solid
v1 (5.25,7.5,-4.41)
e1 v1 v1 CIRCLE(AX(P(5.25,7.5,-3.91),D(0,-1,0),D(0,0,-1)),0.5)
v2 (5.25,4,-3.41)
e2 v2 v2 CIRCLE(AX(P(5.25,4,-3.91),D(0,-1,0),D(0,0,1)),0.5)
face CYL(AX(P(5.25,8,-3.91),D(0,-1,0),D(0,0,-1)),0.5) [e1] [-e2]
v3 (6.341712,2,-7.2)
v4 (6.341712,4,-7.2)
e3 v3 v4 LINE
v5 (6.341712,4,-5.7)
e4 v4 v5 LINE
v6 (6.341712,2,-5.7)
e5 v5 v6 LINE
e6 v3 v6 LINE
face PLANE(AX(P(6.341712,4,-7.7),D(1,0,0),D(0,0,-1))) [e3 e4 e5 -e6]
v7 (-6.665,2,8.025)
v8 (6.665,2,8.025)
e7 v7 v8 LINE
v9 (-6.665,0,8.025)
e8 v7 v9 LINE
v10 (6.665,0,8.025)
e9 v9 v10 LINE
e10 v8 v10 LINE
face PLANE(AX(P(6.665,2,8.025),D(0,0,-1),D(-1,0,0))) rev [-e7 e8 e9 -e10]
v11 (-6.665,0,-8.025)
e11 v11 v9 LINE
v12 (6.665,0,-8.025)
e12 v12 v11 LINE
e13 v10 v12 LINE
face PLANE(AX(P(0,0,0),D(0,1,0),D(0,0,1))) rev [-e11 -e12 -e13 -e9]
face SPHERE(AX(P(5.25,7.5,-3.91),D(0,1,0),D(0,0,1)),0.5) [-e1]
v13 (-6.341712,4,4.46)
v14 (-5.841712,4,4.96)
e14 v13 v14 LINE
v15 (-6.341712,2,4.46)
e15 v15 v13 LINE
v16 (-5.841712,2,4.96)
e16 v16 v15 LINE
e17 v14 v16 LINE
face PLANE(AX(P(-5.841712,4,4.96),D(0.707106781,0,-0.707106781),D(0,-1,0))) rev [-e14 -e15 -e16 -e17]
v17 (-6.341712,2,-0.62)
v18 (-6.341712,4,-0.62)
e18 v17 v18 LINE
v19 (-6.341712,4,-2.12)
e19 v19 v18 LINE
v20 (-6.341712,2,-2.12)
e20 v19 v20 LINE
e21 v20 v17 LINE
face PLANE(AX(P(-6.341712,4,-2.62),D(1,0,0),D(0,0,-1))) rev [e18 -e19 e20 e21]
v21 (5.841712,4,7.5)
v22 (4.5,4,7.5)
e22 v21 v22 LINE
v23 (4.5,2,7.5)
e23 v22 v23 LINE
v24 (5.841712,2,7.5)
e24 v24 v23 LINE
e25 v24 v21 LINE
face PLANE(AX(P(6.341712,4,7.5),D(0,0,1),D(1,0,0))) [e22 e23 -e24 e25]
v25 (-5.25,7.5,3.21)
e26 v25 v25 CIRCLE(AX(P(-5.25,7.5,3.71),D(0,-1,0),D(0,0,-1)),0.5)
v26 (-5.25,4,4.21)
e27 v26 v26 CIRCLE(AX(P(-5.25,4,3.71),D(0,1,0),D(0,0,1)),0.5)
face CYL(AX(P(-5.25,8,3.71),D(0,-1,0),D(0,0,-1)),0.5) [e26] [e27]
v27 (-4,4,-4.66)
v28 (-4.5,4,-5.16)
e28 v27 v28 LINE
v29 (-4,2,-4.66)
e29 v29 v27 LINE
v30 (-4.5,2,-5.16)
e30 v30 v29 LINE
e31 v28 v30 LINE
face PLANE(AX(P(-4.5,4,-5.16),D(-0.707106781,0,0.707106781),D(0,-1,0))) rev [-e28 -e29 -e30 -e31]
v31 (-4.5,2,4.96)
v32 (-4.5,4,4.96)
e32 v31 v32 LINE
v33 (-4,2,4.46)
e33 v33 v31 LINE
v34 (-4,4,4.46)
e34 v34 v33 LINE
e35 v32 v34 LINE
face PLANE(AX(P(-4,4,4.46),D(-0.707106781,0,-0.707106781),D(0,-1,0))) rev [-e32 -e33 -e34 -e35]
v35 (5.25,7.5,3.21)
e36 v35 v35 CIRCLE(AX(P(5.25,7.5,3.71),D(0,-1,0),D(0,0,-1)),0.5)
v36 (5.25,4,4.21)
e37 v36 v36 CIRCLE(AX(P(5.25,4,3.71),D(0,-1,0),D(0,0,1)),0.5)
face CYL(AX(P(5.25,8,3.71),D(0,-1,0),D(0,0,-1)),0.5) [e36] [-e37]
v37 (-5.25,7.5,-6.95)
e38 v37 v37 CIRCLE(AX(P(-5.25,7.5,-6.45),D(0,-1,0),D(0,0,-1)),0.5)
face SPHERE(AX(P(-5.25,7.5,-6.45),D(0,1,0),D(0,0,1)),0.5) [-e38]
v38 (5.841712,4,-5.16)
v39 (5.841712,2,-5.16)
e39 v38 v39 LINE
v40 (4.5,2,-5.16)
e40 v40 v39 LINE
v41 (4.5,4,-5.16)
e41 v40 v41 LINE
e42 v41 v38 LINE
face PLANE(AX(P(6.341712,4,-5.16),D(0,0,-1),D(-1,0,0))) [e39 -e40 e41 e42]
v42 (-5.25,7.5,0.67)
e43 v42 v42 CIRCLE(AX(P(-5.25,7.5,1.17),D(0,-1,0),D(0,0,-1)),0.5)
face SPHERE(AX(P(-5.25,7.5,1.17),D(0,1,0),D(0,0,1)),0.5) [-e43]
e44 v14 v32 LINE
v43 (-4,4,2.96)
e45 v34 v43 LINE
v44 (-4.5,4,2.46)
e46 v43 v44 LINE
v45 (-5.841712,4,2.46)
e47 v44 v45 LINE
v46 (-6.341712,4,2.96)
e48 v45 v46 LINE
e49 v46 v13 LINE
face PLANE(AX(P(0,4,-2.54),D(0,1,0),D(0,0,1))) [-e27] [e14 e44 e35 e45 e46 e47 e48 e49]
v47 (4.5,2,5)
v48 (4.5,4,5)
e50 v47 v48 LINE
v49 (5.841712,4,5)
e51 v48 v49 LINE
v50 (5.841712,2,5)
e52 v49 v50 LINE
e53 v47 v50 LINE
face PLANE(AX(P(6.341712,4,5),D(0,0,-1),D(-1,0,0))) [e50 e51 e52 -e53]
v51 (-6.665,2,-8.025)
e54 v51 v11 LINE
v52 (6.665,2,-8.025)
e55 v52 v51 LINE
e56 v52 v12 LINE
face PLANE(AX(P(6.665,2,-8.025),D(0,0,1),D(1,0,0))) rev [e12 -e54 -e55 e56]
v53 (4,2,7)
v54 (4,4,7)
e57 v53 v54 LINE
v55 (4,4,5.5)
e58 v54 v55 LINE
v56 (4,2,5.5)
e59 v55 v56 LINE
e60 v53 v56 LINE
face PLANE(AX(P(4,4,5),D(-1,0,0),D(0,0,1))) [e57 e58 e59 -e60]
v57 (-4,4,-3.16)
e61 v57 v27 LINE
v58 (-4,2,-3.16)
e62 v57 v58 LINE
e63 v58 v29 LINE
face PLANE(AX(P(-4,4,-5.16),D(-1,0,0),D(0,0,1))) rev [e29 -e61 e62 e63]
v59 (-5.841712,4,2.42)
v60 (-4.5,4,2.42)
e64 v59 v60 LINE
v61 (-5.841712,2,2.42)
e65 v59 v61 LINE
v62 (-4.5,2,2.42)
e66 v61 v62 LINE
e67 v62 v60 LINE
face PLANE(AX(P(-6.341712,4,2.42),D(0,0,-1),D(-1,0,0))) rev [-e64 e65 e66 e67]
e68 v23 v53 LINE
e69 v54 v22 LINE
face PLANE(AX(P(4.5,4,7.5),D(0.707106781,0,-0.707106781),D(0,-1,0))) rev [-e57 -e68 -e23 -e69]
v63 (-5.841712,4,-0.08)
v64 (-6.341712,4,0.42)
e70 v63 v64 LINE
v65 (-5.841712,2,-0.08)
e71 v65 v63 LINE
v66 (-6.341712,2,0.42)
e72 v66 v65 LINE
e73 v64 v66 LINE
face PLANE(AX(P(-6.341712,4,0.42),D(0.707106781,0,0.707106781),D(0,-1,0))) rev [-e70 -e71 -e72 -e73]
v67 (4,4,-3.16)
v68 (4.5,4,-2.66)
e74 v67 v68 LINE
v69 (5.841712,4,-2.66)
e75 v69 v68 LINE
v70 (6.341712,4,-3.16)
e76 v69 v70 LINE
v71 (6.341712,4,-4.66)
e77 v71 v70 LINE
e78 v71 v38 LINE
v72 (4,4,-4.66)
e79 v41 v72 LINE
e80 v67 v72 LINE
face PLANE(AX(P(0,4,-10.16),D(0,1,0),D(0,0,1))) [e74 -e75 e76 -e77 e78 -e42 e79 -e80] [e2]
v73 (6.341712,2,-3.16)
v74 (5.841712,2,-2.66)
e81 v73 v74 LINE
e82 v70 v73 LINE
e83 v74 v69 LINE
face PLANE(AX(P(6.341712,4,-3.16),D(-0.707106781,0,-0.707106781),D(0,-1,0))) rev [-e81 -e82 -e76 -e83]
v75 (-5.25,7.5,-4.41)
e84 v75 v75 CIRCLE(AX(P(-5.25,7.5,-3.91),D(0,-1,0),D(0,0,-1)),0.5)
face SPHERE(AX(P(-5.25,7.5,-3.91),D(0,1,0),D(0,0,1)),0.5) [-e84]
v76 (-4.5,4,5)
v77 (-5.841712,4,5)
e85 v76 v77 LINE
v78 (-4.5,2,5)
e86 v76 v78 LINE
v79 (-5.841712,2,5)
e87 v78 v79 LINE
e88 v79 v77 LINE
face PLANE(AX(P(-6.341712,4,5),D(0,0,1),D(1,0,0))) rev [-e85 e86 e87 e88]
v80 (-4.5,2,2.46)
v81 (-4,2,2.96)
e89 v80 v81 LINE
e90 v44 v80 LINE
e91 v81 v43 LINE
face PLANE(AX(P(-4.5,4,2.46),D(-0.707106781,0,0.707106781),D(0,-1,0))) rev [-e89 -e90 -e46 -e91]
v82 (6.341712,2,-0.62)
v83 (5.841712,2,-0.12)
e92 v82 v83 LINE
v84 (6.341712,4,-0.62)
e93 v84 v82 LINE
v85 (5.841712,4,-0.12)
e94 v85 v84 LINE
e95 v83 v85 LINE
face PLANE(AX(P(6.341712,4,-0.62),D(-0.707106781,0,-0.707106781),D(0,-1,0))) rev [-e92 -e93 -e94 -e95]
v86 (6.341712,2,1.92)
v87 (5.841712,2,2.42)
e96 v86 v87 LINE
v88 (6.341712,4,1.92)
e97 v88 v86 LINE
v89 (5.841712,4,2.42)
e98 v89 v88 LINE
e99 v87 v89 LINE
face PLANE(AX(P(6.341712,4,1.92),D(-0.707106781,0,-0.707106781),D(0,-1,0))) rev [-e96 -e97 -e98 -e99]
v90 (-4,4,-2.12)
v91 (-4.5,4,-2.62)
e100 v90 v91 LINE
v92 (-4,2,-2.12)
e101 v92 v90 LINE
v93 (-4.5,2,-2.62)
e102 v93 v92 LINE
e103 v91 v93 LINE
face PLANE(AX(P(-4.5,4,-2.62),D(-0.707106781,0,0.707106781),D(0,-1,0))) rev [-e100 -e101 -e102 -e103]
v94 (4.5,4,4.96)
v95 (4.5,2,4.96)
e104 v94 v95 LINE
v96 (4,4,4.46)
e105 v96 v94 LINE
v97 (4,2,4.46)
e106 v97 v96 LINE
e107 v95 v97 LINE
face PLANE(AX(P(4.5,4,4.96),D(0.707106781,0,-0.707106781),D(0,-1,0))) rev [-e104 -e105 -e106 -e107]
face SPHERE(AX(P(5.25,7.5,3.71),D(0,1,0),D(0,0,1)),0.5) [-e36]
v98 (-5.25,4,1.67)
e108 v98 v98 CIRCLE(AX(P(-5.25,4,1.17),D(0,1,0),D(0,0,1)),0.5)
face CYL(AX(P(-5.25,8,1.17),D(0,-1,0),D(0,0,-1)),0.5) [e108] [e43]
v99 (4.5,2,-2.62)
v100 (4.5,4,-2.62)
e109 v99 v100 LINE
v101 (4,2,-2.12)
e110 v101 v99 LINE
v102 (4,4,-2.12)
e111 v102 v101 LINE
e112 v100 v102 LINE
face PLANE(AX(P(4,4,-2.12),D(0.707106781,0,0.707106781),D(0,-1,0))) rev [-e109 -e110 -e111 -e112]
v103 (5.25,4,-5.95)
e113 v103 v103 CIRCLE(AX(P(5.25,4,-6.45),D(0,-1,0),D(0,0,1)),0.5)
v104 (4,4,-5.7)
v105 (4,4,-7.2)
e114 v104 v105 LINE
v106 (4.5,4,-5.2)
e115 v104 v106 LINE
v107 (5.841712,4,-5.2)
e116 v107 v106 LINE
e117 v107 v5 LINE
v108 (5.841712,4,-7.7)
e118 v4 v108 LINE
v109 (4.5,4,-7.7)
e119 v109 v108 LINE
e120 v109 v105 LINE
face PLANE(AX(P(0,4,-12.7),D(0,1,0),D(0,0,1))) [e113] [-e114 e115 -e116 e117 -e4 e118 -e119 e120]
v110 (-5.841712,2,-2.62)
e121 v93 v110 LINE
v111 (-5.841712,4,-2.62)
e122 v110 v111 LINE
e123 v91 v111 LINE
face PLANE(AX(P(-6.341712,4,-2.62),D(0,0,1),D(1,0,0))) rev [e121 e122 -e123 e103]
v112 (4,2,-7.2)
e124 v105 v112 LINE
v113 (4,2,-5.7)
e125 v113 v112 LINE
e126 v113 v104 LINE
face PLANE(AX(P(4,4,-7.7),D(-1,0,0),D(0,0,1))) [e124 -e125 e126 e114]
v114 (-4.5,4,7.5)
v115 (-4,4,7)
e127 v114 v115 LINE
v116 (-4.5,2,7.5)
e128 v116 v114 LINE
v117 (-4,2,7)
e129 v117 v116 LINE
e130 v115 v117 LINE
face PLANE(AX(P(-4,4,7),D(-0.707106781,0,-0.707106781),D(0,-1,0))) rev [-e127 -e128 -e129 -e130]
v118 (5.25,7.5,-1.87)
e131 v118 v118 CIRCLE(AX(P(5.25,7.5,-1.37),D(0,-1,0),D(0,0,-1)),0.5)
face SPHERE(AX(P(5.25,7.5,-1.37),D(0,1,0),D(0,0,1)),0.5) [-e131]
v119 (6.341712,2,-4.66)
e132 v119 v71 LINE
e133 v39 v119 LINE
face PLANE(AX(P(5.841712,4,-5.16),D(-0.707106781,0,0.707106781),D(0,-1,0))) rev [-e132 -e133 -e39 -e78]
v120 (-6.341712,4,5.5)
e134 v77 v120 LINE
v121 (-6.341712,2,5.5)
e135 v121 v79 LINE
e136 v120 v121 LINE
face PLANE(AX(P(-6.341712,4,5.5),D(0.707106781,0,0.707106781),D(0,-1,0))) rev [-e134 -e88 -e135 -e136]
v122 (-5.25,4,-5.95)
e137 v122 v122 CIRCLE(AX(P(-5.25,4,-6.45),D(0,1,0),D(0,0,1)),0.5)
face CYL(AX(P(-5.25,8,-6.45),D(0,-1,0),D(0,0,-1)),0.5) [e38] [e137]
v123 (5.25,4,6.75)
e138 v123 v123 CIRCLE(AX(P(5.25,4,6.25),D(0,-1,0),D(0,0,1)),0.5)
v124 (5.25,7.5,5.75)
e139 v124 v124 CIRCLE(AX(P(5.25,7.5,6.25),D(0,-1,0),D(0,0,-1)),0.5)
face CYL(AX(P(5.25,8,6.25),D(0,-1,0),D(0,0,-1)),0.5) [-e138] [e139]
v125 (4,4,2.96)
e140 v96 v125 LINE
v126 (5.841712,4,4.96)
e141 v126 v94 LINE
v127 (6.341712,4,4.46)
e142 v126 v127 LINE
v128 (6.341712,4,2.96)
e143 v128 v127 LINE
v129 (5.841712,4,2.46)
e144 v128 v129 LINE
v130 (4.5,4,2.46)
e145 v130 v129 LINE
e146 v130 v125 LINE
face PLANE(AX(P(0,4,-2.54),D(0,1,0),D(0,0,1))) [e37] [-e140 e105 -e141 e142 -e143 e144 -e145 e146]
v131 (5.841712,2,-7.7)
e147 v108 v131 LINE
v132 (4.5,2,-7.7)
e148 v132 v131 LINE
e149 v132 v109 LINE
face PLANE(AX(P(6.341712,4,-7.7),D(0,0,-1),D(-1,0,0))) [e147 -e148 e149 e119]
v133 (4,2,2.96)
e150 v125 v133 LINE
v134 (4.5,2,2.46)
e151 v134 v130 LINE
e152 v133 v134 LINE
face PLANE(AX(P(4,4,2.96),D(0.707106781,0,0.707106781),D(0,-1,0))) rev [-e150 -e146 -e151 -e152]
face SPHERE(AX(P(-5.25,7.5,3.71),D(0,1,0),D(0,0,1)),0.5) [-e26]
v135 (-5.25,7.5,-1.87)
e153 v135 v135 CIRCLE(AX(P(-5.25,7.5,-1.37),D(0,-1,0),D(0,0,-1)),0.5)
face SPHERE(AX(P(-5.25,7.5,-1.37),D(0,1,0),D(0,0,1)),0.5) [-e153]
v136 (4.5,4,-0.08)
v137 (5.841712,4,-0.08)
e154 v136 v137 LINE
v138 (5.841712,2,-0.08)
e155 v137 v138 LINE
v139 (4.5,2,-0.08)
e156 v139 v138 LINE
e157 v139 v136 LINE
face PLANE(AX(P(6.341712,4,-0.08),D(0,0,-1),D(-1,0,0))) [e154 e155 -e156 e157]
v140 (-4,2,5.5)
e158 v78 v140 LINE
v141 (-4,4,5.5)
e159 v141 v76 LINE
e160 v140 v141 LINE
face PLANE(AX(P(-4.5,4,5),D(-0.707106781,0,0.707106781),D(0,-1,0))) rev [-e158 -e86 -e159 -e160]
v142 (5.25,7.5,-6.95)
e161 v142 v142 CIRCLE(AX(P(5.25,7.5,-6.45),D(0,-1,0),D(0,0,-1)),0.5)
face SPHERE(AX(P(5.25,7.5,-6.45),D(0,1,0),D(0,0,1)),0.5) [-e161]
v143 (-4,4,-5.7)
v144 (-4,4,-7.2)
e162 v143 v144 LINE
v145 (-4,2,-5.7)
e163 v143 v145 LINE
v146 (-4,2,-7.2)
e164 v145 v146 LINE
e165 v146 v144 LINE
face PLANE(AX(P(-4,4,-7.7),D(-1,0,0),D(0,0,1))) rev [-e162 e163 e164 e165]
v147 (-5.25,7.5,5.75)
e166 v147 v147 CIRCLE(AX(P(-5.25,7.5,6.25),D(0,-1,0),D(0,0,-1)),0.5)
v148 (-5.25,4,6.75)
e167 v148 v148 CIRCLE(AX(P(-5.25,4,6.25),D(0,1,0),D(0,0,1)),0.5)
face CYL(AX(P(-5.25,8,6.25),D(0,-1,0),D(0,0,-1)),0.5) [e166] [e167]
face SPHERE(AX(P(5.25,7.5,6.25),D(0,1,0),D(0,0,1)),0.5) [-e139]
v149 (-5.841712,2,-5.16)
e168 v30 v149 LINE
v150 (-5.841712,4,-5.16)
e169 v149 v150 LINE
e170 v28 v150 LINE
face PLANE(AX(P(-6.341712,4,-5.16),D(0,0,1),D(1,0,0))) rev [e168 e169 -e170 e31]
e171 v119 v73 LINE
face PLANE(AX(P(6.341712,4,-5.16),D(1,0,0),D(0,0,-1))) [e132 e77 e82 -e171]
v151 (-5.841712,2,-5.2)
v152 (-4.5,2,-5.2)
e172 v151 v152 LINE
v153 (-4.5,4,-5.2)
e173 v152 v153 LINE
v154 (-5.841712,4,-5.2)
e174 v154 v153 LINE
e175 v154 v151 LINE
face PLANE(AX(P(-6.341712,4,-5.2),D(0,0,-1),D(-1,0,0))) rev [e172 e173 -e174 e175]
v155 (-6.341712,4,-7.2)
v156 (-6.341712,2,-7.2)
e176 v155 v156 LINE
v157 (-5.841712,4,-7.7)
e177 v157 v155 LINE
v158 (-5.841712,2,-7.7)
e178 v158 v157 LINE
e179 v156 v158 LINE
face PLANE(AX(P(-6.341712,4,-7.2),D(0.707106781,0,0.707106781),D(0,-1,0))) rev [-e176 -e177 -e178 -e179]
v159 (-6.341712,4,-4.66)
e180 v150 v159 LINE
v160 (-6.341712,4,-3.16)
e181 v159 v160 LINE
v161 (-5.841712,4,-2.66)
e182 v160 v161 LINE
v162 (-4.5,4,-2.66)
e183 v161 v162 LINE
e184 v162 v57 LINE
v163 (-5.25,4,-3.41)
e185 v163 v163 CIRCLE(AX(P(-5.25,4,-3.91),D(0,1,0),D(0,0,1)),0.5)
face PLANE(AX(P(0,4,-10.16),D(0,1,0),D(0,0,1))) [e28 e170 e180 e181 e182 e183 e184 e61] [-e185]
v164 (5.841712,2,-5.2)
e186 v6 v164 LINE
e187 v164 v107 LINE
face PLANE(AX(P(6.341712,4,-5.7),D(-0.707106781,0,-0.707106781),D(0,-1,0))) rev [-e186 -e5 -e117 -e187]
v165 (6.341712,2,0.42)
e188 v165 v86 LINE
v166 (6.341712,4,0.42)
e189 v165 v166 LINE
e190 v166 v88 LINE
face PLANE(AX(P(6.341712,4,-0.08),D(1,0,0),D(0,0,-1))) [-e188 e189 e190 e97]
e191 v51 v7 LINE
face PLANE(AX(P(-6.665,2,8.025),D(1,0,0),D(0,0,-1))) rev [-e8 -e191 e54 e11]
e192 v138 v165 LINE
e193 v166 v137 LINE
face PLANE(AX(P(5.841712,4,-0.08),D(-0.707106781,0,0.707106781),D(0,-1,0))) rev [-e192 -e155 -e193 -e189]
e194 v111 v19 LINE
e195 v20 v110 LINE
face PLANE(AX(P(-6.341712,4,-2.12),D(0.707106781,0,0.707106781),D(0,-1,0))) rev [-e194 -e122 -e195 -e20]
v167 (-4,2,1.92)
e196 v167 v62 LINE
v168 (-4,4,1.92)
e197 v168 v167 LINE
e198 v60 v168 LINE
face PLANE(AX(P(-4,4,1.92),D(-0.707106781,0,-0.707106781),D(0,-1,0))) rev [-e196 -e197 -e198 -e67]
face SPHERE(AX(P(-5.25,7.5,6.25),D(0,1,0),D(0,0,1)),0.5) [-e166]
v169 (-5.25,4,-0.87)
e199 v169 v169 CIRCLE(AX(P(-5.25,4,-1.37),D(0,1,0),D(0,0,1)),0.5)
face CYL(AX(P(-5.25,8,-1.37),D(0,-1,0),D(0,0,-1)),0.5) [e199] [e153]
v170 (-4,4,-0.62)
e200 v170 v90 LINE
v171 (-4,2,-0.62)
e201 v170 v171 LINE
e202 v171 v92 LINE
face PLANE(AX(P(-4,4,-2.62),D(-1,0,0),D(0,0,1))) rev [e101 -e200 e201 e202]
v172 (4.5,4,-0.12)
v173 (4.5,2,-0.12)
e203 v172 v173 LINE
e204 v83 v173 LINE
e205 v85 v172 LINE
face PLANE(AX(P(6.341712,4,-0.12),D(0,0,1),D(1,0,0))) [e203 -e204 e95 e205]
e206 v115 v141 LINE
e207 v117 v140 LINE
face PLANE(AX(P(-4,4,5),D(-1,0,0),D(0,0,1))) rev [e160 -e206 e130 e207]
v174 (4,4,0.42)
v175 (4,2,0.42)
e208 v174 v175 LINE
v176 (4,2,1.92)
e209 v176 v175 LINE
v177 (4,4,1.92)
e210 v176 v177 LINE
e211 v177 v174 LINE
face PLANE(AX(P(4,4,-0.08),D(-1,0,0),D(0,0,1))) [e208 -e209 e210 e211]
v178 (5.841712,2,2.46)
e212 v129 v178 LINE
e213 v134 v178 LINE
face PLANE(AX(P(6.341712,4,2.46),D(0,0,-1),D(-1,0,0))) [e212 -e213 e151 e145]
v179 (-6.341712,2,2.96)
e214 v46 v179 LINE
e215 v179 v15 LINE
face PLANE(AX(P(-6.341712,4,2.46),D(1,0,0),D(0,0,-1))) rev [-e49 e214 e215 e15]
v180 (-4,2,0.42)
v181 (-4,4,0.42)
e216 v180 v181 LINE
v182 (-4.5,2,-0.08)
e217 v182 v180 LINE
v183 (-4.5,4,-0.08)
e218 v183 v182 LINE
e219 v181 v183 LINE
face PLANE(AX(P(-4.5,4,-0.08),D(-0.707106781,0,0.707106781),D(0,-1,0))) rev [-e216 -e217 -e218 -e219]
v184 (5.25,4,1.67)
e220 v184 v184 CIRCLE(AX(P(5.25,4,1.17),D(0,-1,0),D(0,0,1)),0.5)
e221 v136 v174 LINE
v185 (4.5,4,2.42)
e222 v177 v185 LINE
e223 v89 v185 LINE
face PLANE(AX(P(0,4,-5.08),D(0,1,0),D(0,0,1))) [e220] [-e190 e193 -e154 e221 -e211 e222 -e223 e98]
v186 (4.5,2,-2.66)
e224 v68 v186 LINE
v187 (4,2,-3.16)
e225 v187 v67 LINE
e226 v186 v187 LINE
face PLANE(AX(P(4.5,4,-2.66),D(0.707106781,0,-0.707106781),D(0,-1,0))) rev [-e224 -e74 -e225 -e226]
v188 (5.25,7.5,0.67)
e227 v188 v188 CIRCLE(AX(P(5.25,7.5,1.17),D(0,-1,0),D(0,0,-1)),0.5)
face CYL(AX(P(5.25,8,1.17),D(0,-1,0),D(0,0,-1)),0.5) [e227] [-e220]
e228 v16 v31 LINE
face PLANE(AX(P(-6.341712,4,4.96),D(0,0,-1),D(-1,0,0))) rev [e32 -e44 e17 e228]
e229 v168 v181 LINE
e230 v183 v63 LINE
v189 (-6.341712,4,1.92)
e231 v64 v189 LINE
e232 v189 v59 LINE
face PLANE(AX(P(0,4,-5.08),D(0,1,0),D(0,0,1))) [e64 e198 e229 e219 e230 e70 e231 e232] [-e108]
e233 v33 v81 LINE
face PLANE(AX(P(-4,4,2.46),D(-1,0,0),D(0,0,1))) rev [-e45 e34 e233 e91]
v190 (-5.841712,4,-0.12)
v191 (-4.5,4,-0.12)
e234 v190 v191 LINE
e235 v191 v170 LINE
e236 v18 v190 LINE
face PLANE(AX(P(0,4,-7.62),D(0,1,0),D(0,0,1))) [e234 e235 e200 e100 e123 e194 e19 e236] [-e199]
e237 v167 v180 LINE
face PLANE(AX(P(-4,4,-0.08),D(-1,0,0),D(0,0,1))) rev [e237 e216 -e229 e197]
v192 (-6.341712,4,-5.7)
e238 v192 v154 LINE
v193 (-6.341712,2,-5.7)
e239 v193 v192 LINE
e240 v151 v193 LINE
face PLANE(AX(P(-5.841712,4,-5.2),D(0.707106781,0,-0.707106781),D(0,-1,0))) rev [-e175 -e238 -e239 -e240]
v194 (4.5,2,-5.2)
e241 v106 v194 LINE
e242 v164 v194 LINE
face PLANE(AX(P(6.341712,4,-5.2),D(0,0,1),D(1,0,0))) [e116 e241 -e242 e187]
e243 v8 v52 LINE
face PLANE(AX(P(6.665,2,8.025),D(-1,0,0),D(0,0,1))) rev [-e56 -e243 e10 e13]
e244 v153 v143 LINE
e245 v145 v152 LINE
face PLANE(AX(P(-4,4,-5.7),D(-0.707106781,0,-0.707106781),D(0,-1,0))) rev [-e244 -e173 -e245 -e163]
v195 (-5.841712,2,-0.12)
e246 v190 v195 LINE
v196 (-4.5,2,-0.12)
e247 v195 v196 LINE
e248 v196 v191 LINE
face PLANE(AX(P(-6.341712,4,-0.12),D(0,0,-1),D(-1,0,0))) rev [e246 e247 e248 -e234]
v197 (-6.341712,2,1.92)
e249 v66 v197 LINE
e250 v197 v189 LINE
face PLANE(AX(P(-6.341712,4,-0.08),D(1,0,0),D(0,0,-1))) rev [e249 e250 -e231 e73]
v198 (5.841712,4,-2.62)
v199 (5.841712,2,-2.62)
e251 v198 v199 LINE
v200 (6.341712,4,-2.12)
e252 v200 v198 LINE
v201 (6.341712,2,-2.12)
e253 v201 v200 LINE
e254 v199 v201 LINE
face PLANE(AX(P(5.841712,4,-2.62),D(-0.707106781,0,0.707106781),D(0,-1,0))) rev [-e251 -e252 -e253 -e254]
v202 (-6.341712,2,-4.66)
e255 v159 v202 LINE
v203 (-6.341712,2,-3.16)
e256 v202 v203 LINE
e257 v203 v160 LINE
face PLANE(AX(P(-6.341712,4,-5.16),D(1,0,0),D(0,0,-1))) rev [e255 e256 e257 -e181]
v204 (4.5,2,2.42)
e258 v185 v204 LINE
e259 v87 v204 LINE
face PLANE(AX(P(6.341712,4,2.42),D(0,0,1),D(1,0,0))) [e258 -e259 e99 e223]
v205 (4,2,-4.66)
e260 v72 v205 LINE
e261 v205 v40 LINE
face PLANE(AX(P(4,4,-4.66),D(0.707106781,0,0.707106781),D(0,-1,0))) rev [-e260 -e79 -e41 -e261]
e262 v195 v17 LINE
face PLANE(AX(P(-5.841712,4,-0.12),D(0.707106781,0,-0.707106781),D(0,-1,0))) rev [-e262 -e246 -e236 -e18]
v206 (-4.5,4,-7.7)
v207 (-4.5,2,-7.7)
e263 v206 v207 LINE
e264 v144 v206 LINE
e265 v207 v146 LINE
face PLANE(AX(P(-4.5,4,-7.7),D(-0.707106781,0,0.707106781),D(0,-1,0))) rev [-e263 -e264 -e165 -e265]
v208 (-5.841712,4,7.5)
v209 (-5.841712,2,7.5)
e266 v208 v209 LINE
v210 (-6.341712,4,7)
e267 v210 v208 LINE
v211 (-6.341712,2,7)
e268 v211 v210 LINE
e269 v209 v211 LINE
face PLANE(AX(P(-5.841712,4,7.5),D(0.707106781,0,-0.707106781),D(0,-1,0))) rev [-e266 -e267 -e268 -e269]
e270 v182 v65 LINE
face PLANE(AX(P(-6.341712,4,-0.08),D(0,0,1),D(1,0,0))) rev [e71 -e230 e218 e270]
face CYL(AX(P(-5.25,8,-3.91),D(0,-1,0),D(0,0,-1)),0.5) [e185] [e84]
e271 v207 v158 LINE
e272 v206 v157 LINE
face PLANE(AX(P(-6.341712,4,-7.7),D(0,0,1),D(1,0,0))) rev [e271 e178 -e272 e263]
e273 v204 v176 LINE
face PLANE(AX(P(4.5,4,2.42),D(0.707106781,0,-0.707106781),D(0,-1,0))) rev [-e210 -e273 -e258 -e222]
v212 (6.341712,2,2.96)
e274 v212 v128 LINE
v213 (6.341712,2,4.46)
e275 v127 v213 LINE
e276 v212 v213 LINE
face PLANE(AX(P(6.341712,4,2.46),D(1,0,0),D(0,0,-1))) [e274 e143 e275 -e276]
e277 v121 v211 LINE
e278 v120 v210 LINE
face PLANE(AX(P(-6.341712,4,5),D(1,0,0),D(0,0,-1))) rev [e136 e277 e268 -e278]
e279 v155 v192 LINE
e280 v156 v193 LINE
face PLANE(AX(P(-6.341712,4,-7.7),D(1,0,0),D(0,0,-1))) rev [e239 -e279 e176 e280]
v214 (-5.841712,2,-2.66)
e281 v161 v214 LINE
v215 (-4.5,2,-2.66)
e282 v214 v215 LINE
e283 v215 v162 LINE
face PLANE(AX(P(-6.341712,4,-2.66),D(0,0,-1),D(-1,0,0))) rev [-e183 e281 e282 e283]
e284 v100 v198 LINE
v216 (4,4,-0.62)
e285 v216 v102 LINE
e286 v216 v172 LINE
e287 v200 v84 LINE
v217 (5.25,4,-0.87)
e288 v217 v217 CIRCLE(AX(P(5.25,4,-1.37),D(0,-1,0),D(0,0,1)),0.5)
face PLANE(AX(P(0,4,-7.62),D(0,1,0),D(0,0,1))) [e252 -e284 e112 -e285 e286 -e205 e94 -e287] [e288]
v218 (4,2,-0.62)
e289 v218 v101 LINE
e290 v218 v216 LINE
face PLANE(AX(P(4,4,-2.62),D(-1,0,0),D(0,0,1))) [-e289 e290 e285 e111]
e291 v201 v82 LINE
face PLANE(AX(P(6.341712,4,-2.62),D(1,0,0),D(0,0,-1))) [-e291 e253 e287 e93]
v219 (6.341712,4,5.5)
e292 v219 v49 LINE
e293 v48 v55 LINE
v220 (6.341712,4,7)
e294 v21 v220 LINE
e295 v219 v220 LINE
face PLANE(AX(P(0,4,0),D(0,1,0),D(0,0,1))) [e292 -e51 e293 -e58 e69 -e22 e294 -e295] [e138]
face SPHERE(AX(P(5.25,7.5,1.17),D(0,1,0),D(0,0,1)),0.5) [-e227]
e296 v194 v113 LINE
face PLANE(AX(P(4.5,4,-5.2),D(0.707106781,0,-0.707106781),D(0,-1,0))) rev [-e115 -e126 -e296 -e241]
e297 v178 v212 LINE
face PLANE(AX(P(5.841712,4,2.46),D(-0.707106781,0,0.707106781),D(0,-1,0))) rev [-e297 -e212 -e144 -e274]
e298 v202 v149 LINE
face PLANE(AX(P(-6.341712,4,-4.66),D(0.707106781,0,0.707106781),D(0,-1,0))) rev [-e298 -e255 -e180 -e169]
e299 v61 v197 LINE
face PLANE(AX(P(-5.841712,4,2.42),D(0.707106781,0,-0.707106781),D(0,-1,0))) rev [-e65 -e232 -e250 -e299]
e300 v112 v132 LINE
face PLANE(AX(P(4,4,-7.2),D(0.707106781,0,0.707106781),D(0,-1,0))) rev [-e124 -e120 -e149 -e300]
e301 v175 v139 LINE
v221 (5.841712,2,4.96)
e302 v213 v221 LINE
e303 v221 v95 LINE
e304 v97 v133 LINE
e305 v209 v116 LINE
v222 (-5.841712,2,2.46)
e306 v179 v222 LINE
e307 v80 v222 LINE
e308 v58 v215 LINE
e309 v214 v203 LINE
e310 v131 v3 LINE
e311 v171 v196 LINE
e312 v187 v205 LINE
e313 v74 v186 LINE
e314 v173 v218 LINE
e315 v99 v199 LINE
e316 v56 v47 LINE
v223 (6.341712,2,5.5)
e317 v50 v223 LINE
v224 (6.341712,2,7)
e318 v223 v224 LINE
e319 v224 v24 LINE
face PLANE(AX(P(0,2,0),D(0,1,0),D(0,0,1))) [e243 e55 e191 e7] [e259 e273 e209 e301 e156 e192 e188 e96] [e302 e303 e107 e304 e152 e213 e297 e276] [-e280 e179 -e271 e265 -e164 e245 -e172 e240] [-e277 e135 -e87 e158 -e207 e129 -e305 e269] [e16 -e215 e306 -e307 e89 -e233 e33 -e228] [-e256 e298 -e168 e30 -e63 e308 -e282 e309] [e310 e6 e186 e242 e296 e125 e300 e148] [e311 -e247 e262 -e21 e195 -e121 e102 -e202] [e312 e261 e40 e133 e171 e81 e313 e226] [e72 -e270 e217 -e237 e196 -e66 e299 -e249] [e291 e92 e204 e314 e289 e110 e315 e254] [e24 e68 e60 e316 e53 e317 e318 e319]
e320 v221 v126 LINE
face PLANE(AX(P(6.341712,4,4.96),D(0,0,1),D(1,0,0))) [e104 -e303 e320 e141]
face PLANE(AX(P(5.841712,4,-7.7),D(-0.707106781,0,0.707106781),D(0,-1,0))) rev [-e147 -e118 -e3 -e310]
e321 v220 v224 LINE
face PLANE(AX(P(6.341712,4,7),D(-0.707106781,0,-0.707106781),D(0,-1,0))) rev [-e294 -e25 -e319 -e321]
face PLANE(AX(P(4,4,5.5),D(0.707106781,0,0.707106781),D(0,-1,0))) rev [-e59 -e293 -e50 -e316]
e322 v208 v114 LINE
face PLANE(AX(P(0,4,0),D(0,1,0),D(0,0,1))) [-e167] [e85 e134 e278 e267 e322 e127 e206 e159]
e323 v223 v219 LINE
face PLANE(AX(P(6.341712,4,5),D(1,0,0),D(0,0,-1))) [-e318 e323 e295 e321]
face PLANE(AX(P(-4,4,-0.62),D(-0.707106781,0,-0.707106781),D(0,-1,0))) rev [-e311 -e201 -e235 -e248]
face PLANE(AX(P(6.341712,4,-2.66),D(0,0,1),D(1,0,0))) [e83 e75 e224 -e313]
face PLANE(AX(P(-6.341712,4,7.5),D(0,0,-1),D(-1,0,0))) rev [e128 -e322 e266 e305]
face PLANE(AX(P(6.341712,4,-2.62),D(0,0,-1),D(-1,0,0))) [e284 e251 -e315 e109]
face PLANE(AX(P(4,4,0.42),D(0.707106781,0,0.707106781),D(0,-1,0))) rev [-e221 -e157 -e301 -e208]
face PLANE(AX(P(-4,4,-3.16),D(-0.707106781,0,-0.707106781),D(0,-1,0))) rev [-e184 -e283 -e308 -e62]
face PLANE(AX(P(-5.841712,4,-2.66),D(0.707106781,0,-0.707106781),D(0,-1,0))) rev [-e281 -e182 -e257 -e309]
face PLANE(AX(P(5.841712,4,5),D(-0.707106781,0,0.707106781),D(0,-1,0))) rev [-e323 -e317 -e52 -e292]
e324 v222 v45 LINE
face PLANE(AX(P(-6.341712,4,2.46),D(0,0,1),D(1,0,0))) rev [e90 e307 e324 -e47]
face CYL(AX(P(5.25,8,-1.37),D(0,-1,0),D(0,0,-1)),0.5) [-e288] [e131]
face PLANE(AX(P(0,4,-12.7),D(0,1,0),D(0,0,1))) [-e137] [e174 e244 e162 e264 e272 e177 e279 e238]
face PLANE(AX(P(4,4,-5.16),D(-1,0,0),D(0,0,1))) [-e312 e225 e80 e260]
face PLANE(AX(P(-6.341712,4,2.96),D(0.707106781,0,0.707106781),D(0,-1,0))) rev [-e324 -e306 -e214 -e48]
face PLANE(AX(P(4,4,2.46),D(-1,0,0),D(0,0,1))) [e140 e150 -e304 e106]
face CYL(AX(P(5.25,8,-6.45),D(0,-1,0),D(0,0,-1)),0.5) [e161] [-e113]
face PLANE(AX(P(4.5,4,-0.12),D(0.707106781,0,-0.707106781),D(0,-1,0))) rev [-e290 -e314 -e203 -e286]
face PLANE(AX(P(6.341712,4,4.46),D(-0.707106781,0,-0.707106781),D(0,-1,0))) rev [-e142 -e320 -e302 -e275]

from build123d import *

# Parameters (mm, degrees)
SKETCH1_W                  = 13.33
SKETCH1_H                  = 16.05
BOSS_EXTRUDE1_DEPTH        = 2
SKETCH2_W                  = 2.341712188
SKETCH2_H                  = 2.5
BOSS_EXTRUDE2_DEPTH        = 2
CHAMFER1_SIZE              = 0.5
SKETCH3_R                  = 0.5
BOSS_EXTRUDE3_DEPTH        = 4
FILLET1_R                  = 0.5
LPATTERN1_COUNT            = 6
LPATTERN1_PITCH            = 2.54
CHAMFER1_OF_LPATTERN1_SIZE = 0.5
FILLET1_OF_LPATTERN1_R     = 0.5


# Read off the part's stored shape, not the designer's step: Mirror1
with BuildPart() as part:
    # Sketch1 → Boss-Extrude1 (new body)
    with BuildSketch(Plane(origin=(0, 0, 0), x_dir=(1, 0, 0), z_dir=(0, 1, 0))):
        Rectangle(SKETCH1_W, SKETCH1_H)
    extrude(amount=BOSS_EXTRUDE1_DEPTH)

    # Sketch2 → Boss-Extrude2 (add)
    with BuildSketch(Plane(origin=(0, 2, 0), x_dir=(1, 0, 0), z_dir=(0, 1, 0))):
        with Locations((-5.170856094, -6.25)):
            Rectangle(SKETCH2_W, SKETCH2_H)
    boss_extrude2 = extrude(amount=BOSS_EXTRUDE2_DEPTH)

    # Chamfer1
    chamfer1_edges = [part.edges().sort_by_distance(p)[0] for p in [
        (-6.341712188, 3, 5),
        (-6.341712188, 3, 7.5),
        (-4, 3, 7.5),
        (-4, 3, 5),
    ]]
    chamfer(chamfer1_edges, length=CHAMFER1_SIZE)

    # Sketch3 → Boss-Extrude3 (add)
    with BuildSketch(Plane(origin=(0, 4, 0), x_dir=(1, 0, 0), z_dir=(0, 1, 0))):
        with Locations(Location((-5.25, -6.25, 0), (0, 0, 270))):
            Circle(SKETCH3_R)
    boss_extrude3 = extrude(amount=BOSS_EXTRUDE3_DEPTH)

    # Fillet1
    fillet1_edges = [part.edges().sort_by_distance(p)[0] for p in [
        (-5.25, 8, 5.75),
    ]]
    fillet(fillet1_edges, radius=FILLET1_R)

    # LPattern1: Boss-Extrude2, Boss-Extrude3 ×6
    with Locations(*[(0, 0, -i * LPATTERN1_PITCH) for i in range(1, LPATTERN1_COUNT)]):
        add(boss_extrude2)
        add(boss_extrude3)

    # Chamfer1 of LPattern1
    chamfer1_of_lpattern1_edges = [part.edges().sort_by_distance(p)[0] for p in [
        (-6.341712188, 3, 2.46),
        (-6.341712188, 3, 4.96),
        (-4, 3, 4.96),
        (-4, 3, 2.46),
        (-6.341712188, 3, -0.08),
        (-6.341712188, 3, 2.42),
        (-4, 3, 2.42),
        (-4, 3, -0.08),
        (-6.341712188, 3, -2.62),
        (-6.341712188, 3, -0.12),
        (-4, 3, -0.12),
        (-4, 3, -2.62),
        (-6.341712188, 3, -5.16),
        (-6.341712188, 3, -2.66),
        (-4, 3, -2.66),
        (-4, 3, -5.16),
        (-6.341712188, 3, -7.7),
        (-6.341712188, 3, -5.2),
        (-4, 3, -5.2),
        (-4, 3, -7.7),
    ]]
    chamfer(chamfer1_of_lpattern1_edges, length=CHAMFER1_OF_LPATTERN1_SIZE)

    # Fillet1 of LPattern1
    fillet1_of_lpattern1_edges = [part.edges().sort_by_distance(p)[0] for p in [
        (-5.25, 8, 3.21),
        (-5.25, 8, 0.67),
        (-5.25, 8, -1.87),
        (-5.25, 8, -4.41),
        (-5.25, 8, -6.95),
    ]]
    fillet(fillet1_of_lpattern1_edges, radius=FILLET1_OF_LPATTERN1_R)

    # Mirror1: part across plane


with BuildPart() as part_1:
    add(part.part)
    add(part.part.mirror(Plane(origin=(0, 0, 0), x_dir=(0, 0, 1), z_dir=(1, 0, 0))))


solid = part_1.part
